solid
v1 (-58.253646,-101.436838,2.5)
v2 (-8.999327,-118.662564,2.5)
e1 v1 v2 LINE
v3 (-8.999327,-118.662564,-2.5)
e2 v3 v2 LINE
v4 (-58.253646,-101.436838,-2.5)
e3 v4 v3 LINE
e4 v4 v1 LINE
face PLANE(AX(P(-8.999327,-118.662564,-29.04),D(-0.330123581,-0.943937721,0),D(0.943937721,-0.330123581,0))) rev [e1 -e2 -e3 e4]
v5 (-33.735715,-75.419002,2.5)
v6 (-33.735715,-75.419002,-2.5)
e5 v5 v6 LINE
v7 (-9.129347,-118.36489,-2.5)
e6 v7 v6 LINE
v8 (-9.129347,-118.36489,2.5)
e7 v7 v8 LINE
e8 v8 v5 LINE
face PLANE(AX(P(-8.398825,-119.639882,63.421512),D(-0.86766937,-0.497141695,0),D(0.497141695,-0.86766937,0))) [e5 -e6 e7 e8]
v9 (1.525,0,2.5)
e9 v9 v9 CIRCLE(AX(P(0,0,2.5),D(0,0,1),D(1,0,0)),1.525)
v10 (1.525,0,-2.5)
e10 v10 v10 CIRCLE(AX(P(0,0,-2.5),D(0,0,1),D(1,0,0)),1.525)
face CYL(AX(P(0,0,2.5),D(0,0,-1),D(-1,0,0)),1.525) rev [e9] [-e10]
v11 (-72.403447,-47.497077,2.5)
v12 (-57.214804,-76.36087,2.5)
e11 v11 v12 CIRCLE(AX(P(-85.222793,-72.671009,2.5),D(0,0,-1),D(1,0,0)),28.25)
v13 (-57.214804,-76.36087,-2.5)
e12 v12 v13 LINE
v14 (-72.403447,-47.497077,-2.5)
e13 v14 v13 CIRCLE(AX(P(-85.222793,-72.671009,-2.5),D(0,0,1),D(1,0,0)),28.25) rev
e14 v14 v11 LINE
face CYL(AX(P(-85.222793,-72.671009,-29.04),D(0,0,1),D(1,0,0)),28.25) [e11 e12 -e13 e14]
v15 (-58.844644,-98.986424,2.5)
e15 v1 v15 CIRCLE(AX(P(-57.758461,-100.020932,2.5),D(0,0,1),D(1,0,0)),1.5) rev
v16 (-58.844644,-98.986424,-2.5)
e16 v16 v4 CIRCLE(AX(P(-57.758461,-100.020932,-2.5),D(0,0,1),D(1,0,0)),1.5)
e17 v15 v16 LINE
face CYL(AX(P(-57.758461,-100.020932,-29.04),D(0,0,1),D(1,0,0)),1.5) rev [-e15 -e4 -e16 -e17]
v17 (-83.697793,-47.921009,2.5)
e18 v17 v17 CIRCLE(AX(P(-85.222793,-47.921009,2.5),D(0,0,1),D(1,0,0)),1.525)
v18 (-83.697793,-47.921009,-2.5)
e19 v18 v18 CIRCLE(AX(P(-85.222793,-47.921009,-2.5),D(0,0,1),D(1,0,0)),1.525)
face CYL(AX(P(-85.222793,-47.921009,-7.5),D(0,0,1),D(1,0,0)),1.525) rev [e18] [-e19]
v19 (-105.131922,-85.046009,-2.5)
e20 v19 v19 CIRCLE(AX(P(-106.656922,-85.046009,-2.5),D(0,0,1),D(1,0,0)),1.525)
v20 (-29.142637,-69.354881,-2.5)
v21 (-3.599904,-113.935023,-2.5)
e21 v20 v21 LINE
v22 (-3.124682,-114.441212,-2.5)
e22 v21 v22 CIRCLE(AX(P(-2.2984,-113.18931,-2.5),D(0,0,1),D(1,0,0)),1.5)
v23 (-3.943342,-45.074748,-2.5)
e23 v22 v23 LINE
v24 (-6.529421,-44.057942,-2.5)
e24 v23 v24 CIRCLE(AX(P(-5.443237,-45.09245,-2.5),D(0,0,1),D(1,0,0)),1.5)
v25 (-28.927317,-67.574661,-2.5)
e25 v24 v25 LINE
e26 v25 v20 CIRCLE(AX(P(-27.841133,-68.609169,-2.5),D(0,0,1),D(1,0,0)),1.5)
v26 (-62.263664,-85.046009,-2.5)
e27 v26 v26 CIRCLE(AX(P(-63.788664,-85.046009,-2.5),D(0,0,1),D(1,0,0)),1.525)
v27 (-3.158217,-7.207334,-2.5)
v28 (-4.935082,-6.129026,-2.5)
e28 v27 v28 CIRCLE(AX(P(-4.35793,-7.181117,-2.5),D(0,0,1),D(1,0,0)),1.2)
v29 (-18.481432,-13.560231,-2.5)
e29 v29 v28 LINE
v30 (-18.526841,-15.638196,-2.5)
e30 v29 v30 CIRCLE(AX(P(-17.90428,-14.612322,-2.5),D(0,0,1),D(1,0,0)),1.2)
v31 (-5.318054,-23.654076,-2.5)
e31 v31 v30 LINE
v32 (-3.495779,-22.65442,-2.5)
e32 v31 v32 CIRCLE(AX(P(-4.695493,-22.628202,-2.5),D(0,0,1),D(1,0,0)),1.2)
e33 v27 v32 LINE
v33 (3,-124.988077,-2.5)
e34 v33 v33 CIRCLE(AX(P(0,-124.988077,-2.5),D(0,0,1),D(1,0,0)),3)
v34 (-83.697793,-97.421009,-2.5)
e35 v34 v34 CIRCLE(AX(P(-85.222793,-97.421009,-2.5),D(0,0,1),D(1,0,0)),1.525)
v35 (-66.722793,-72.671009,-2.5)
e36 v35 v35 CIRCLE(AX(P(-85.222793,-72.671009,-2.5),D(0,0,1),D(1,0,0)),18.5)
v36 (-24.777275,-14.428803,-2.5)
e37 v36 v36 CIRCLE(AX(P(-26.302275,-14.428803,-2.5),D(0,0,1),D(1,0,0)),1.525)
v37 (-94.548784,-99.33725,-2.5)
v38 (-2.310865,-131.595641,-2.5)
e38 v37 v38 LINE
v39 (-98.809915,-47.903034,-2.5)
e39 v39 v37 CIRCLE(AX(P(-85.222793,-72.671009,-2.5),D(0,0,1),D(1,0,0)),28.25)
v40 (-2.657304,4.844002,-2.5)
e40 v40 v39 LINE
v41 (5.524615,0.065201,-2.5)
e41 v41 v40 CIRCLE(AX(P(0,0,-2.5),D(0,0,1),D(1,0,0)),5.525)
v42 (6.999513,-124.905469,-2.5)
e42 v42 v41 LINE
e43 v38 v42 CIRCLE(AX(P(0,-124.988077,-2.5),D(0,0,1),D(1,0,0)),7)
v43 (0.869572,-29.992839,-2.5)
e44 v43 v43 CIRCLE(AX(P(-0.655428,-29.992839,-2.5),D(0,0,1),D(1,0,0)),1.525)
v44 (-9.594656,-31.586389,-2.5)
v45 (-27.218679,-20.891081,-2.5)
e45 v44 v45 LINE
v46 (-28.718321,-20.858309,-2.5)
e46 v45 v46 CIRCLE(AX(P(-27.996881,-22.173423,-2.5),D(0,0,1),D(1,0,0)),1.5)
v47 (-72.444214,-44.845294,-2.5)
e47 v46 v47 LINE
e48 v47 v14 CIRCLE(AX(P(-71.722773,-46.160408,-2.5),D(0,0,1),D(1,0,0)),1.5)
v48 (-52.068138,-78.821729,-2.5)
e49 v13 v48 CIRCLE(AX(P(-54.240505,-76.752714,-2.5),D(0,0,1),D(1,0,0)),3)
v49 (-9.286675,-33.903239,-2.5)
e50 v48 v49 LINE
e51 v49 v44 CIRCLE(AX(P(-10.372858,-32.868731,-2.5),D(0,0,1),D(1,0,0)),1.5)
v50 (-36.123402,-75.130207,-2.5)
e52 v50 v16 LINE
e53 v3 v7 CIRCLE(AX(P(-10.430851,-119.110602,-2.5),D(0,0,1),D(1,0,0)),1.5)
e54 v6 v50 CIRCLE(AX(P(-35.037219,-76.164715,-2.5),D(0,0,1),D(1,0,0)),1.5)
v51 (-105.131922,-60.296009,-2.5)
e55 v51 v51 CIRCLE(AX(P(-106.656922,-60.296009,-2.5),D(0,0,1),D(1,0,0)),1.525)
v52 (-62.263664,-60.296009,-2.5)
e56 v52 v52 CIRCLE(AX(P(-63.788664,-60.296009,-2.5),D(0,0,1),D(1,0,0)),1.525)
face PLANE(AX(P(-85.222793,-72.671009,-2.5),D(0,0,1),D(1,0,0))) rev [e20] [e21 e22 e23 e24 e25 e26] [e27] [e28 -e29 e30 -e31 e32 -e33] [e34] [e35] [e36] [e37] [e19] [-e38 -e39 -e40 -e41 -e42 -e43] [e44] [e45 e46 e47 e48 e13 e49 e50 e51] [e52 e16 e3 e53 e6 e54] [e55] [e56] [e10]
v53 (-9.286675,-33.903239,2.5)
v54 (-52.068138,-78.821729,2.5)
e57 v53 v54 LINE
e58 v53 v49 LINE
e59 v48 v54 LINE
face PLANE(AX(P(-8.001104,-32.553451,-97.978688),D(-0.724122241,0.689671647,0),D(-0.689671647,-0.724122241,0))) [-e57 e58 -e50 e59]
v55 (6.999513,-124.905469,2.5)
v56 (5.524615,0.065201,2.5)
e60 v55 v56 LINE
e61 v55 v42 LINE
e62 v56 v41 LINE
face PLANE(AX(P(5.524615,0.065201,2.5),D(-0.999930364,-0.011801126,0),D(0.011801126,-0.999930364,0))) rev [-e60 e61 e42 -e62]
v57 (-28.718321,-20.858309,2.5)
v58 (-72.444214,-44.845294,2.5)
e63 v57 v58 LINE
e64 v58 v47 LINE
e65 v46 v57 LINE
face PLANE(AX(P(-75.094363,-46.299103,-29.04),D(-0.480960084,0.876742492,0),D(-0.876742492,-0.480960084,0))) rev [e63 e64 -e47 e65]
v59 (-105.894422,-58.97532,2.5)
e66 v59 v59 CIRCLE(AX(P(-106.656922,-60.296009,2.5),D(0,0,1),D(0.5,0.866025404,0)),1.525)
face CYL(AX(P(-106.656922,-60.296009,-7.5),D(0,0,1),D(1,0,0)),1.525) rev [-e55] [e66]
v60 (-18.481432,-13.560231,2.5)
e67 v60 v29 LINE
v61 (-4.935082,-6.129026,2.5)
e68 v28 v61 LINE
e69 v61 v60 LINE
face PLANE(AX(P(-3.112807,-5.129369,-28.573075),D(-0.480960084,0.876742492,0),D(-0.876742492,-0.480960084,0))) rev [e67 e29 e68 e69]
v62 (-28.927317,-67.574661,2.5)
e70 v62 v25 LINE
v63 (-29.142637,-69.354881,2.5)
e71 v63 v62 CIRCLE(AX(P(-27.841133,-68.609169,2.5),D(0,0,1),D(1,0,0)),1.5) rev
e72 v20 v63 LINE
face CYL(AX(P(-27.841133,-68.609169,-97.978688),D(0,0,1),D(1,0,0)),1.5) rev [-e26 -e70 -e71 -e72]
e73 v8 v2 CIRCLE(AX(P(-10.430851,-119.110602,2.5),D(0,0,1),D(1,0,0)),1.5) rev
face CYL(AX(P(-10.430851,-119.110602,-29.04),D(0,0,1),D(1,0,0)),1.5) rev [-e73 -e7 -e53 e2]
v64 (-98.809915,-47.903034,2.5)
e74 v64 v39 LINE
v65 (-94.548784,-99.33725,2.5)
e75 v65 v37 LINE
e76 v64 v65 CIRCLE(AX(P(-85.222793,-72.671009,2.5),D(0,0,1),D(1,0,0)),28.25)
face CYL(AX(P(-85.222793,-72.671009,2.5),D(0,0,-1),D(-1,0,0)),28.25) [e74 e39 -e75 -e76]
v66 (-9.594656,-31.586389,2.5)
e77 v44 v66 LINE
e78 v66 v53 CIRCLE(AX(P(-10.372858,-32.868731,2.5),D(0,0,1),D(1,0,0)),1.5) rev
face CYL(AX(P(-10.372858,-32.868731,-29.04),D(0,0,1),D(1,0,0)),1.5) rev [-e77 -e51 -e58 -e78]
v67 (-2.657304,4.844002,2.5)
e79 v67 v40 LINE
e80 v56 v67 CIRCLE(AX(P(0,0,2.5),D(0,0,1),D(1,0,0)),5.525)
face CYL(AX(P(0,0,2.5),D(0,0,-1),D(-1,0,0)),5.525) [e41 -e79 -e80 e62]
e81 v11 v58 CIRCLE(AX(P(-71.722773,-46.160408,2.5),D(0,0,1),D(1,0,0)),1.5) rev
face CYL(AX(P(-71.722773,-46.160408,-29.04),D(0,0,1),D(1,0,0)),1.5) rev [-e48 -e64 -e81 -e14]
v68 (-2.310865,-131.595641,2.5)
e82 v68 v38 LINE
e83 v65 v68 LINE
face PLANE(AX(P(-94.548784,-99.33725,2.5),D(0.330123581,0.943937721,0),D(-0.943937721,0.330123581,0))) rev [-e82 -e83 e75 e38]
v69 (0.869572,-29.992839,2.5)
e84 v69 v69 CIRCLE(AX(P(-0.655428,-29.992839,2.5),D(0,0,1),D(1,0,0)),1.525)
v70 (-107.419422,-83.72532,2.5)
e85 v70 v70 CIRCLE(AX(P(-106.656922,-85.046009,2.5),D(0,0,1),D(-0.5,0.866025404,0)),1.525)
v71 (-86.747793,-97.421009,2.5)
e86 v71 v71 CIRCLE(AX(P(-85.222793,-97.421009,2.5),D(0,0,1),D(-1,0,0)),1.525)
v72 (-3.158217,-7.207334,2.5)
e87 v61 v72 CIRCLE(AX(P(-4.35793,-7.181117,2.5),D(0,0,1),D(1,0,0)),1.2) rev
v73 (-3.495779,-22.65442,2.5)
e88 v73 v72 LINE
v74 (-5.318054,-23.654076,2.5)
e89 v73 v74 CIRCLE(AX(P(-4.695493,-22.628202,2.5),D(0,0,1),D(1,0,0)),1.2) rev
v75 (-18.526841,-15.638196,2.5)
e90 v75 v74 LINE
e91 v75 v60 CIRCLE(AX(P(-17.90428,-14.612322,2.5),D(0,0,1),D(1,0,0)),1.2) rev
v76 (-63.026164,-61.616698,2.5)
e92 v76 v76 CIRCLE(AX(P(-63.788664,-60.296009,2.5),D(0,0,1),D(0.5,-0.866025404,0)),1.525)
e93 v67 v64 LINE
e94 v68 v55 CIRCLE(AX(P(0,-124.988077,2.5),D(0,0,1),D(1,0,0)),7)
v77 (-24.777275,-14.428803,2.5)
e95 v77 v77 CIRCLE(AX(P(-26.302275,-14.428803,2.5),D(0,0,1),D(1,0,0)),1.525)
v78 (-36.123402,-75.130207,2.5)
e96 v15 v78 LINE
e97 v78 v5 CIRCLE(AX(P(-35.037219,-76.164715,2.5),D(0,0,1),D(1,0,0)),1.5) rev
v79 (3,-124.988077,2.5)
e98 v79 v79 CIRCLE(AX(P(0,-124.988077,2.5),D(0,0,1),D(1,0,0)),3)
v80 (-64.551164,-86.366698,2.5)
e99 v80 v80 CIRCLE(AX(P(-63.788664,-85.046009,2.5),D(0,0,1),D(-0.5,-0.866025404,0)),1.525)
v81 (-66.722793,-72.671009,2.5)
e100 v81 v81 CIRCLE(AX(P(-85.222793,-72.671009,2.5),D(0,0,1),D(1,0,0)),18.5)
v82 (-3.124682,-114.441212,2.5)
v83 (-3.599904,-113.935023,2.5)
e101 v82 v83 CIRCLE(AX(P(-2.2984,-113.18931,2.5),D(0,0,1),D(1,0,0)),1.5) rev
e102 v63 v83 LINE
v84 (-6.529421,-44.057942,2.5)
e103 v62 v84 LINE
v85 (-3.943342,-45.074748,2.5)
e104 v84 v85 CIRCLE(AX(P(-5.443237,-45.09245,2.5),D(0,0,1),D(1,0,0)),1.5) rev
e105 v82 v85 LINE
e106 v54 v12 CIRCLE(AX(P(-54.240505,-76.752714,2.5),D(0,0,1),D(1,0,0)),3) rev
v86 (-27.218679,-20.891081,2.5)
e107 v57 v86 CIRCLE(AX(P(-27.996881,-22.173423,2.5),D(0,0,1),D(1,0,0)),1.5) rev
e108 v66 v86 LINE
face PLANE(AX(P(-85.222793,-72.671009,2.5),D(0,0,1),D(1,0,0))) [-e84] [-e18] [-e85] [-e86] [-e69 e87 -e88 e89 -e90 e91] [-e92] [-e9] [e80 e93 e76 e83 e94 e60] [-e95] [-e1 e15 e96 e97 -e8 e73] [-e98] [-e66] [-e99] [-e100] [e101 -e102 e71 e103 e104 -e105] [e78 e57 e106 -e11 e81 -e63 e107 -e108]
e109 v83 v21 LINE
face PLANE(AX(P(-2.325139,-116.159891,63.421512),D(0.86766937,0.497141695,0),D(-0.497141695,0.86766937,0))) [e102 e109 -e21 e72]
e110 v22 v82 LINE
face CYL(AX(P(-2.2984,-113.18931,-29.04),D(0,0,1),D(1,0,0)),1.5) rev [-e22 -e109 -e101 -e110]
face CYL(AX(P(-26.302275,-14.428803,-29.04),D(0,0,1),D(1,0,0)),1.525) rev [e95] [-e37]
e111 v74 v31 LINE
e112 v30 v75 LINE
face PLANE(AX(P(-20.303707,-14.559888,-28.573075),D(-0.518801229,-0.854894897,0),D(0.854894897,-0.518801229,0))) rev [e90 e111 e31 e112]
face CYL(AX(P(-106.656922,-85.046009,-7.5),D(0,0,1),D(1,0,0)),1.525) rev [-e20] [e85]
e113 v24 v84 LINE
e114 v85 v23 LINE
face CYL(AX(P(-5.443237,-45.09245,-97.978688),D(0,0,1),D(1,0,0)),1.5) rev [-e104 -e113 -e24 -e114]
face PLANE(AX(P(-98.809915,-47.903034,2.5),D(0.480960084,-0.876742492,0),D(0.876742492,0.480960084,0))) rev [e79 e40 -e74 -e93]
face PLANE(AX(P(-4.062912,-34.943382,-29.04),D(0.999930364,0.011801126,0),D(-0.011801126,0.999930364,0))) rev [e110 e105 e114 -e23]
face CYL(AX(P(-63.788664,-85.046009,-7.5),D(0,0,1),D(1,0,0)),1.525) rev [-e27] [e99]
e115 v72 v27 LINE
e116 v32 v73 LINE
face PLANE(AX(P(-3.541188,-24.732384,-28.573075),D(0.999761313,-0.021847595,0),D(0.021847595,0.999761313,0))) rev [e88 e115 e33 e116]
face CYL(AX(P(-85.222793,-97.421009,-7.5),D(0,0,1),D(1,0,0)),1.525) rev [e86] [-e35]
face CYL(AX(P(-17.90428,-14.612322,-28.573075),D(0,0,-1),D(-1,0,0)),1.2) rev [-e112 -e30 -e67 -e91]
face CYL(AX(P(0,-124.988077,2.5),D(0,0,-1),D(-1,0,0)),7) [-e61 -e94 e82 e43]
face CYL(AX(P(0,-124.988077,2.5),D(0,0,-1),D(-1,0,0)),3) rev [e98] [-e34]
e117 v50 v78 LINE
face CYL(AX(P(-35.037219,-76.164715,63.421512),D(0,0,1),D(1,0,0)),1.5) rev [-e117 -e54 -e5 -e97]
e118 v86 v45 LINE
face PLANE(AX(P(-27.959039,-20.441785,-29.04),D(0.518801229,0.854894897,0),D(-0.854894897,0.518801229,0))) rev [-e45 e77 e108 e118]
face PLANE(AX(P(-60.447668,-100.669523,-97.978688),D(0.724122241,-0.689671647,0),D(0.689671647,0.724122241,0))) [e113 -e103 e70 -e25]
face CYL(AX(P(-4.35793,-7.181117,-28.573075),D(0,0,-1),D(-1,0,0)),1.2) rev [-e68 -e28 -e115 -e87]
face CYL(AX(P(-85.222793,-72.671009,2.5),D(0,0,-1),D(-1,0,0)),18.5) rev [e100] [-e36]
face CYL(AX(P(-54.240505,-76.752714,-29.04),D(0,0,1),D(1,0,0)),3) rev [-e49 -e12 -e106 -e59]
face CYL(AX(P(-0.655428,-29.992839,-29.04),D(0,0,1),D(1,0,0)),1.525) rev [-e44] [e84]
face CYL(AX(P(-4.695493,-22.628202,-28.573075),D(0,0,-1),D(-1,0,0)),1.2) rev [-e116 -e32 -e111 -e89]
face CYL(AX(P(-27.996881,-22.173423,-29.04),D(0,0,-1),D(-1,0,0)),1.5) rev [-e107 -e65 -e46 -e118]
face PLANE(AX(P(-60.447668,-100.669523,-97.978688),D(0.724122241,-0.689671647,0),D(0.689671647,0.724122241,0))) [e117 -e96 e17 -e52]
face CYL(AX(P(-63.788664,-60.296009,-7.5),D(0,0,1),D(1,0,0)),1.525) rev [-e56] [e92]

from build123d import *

# Parameters (mm, degrees)
SKETCH_1_R               = 18.5
SKETCH_1_R_2             = 1.525
SKETCH_1_R_3             = 3
EXTRUDE_1_DEPTH          = 2.5
SKETCH_4_R               = 1.525
CUT_EXTRUDE_3_DEPTH      = 10
PATTERN_CIRCULAR_2_COUNT = 6
SKETCH_5_R               = 1.525
CUT_EXTRUDE_4_DEPTH      = 31.54
CUT_EXTRUDE_5_DEPTH      = 31.54
EXTRUDE_2_DEPTH          = 5
EXTRUDE_3_DEPTH          = 5
FILLET_START             = -2.5
FILLET_2_DEPTH           = 5
CUT_EXTRUDE_7_DEPTH      = 5
FILLET_4_R               = 1.2


with BuildPart() as part:
    # 草图1 → 凸台-拉伸1 (new, symmetric)
    with BuildSketch(Plane.XY):
        with BuildLine():
            Line((-94.548784095, -99.337249729), (-2.310865067, -131.595640783))
            ThreePointArc((-2.310865067, -131.595640783), (4.084783214, -130.672665207), (6.99951255, -124.905468856))
            Line((6.99951255, -124.905468856), (5.524615263, 0.065201219))
            ThreePointArc((5.524615263, 0.065201219), (2.786503665, 4.770851321), (-2.657304464, 4.84400227))
            Line((-2.657304464, 4.84400227), (-98.809915302, -47.903033704))
            ThreePointArc((-98.809915302, -47.903033704), (-113.376342219, -75.003424702), (-94.548784095, -99.337249729))
        make_face()
        with Locations((-85.222792931, -72.671009109)):
            Circle(SKETCH_1_R, mode=Mode.SUBTRACT)
        Circle(SKETCH_1_R_2, mode=Mode.SUBTRACT)
        with Locations((0, -124.988076735)):
            Circle(SKETCH_1_R_3, mode=Mode.SUBTRACT)
    extrude(amount=EXTRUDE_1_DEPTH, both=True)

    # 草图4 → 切除-拉伸3 (cut)
    with BuildSketch(Plane.XY.offset(2.5)):
        with Locations((-85.222792931, -47.921009109)):
            Circle(SKETCH_4_R)
    cut_extrude_3 = extrude(amount=-CUT_EXTRUDE_3_DEPTH, mode=Mode.SUBTRACT)

    # 阵列(圆周)2: 切除-拉伸3 ×6 about axis
    pattern_circular_2_axis = Axis((-85.222792931, -72.671009109, 0), (0, 0, 1))
    for i in range(1, PATTERN_CIRCULAR_2_COUNT):
        add(cut_extrude_3.rotate(pattern_circular_2_axis, i * 360 / PATTERN_CIRCULAR_2_COUNT), mode=Mode.SUBTRACT)

    # 草图5 → 切除-拉伸4 (cut)
    with BuildSketch(Plane.XY.offset(2.5)):
        with Locations((-0.655427857, -29.992839384)):
            Circle(SKETCH_5_R)
        with Locations((-26.302274767, -14.428802517)):
            Circle(SKETCH_5_R)
    extrude(amount=-CUT_EXTRUDE_4_DEPTH, mode=Mode.SUBTRACT)

    # 草图6 → 切除-拉伸5 (cut)
    with BuildSketch(Plane.XY.offset(2.5)):
        with BuildLine():
            Line((-75.094363285, -46.299103359), (-27.959039434, -20.441785485))
            Line((-27.959039434, -20.441785485), (-4.062911687, -34.943381511))
            Line((-4.062911687, -34.943381511), (-3.124682468, -114.441211823))
            ThreePointArc((-3.124682468, -114.441211823), (-6.418945051, -116.055151994), (-8.999327109, -118.662563983))
            Line((-8.999327109, -118.662563983), (-70.892608691, -97.016610758))
            ThreePointArc((-70.892608691, -97.016610758), (-57.069243644, -70.338593517), (-75.094363285, -46.299103359))
        make_face()
    extrude(amount=-CUT_EXTRUDE_5_DEPTH, mode=Mode.SUBTRACT)

    # 草图7 → 凸台-拉伸2 (add)
    with BuildSketch(Plane.XY.offset(2.5)):
        with BuildLine():
            Line((-65.109328248, -99.039198909), (-60.447667843, -100.669522597))
            Line((-60.447667843, -100.669522597), (-3.986848357, -41.388362786))
            Line((-3.986848357, -41.388362786), (-4.062911687, -34.943381511))
            Line((-4.062911687, -34.943381511), (-8.001104314, -32.553451262))
            Line((-8.001104314, -32.553451262), (-64.766339632, -92.154233135))
            ThreePointArc((-64.766339632, -92.154233135), (-67.660383733, -94.798464524), (-70.892608691, -97.016610758))
            Line((-70.892608691, -97.016610758), (-65.109328248, -99.039198909))
        make_face()
    extrude(amount=-EXTRUDE_2_DEPTH)

    # 草图8 → 凸台-拉伸3 (add)
    with BuildSketch(Plane(origin=(0, 0, -2.5), x_dir=(-1, 0, 0), z_dir=(0, 0, -1))):
        Polygon((8.398824834, -119.639882413), (35.254100893, -72.768938625), (29.6986281, -68.384501663), (2.325139246, -116.159890547), align=None)
    extrude(amount=-EXTRUDE_3_DEPTH)

    # 圆角2: read off the stored shape, not the designer's step
    # 圆角2 outline → 圆角2 (add)
    with BuildSketch(Plane.XY.offset(FILLET_START)):
        with BuildLine():
            ThreePointArc((-52.068137932, -78.821728734), (-55.534618391, -79.459237326), (-57.214804329, -76.360870144))
            ThreePointArc((-57.214804329, -76.360870144), (-59.736362996, -84.857246804), (-64.766339632, -92.154233135))
            Line((-64.766339632, -92.154233135), (-52.068137932, -78.821728734))
        make_face()
        with BuildLine():
            ThreePointArc((-75.094363285, -46.299103359), (-73.733280759, -46.862994656), (-72.403446669, -47.497076929))
            ThreePointArc((-72.403446669, -47.497076929), (-73.222596192, -46.183465315), (-72.444213542, -44.845294226))
            Line((-72.444213542, -44.845294226), (-75.094363285, -46.299103359))
        make_face()
        with BuildLine():
            ThreePointArc((-9.594656237, -31.586388879), (-8.885938003, -32.671073224), (-9.286674719, -33.903238695))
            Line((-9.286674719, -33.903238695), (-8.001104314, -32.553451262))
            Line((-8.001104314, -32.553451262), (-9.594656237, -31.586388879))
        make_face()
        with BuildLine():
            Line((-27.959039434, -20.441785485), (-28.718320704, -20.858309136))
            ThreePointArc((-28.718320704, -20.858309136), (-27.964109185, -20.673780905), (-27.218678735, -20.891080529))
            Line((-27.218678735, -20.891080529), (-27.959039434, -20.441785485))
        make_face()
        with BuildLine():
            ThreePointArc((-6.52942074, -44.057942172), (-4.894363129, -43.696477917), (-3.943341833, -45.074747954))
            Line((-3.943341833, -45.074747954), (-3.986848357, -41.388362786))
            Line((-3.986848357, -41.388362786), (-6.52942074, -44.057942172))
        make_face()
        with BuildLine():
            ThreePointArc((-3.282371439, -114.489217858), (-3.203616876, -114.464919466), (-3.124682468, -114.441211823))
            ThreePointArc((-3.124682468, -114.441211823), (-3.391983975, -114.215991533), (-3.599904234, -113.93502278))
            Line((-3.599904234, -113.93502278), (-3.282371439, -114.489217858))
        make_face()
        with BuildLine():
            ThreePointArc((-29.142637234, -69.354881433), (-29.330280124, -68.429053989), (-28.927316541, -67.57466142))
            Line((-28.927316541, -67.57466142), (-29.6986281, -68.384501663))
            Line((-29.6986281, -68.384501663), (-29.142637234, -69.354881433))
        make_face()
        with BuildLine():
            ThreePointArc((-36.123402256, -75.130207215), (-34.857103993, -74.675567741), (-33.73571484, -75.419002143))
            Line((-33.73571484, -75.419002143), (-34.7358881, -73.67338372))
            Line((-34.7358881, -73.67338372), (-36.123402256, -75.130207215))
        make_face()
        with BuildLine():
            Line((-8.976957664, -118.630857917), (-9.129347243, -118.364889943))
            ThreePointArc((-9.129347243, -118.364889943), (-9.05625561, -118.510197041), (-8.999327109, -118.662563983))
            ThreePointArc((-8.999327109, -118.662563983), (-8.988156367, -118.646701086), (-8.976957664, -118.630857917))
        make_face()
        with BuildLine():
            ThreePointArc((-58.2536461, -101.436838383), (-59.216649338, -100.372621972), (-58.844644089, -98.986424331))
            Line((-58.844644089, -98.986424331), (-60.447667843, -100.669522597))
            Line((-60.447667843, -100.669522597), (-58.2536461, -101.436838383))
        make_face()
    extrude(amount=FILLET_2_DEPTH)

    # 草图12 → 切除-拉伸7 (cut)
    with BuildSketch(Plane.XY.offset(2.5)):
        Polygon((-3.112807373, -5.129369382), (-20.30370689, -14.559888089), (-3.541188361, -24.732384431), align=None)
    extrude(amount=-CUT_EXTRUDE_7_DEPTH, mode=Mode.SUBTRACT)

    # 圆角4
    fillet_4_edges = [part.edges().sort_by_distance(p)[0] for p in [
        (-3.112807373, -5.129369382, 0),
        (-3.541188361, -24.732384431, 0),
        (-20.30370689, -14.559888089, 0),
    ]]
    fillet(fillet_4_edges, radius=FILLET_4_R)


solid = part.part
